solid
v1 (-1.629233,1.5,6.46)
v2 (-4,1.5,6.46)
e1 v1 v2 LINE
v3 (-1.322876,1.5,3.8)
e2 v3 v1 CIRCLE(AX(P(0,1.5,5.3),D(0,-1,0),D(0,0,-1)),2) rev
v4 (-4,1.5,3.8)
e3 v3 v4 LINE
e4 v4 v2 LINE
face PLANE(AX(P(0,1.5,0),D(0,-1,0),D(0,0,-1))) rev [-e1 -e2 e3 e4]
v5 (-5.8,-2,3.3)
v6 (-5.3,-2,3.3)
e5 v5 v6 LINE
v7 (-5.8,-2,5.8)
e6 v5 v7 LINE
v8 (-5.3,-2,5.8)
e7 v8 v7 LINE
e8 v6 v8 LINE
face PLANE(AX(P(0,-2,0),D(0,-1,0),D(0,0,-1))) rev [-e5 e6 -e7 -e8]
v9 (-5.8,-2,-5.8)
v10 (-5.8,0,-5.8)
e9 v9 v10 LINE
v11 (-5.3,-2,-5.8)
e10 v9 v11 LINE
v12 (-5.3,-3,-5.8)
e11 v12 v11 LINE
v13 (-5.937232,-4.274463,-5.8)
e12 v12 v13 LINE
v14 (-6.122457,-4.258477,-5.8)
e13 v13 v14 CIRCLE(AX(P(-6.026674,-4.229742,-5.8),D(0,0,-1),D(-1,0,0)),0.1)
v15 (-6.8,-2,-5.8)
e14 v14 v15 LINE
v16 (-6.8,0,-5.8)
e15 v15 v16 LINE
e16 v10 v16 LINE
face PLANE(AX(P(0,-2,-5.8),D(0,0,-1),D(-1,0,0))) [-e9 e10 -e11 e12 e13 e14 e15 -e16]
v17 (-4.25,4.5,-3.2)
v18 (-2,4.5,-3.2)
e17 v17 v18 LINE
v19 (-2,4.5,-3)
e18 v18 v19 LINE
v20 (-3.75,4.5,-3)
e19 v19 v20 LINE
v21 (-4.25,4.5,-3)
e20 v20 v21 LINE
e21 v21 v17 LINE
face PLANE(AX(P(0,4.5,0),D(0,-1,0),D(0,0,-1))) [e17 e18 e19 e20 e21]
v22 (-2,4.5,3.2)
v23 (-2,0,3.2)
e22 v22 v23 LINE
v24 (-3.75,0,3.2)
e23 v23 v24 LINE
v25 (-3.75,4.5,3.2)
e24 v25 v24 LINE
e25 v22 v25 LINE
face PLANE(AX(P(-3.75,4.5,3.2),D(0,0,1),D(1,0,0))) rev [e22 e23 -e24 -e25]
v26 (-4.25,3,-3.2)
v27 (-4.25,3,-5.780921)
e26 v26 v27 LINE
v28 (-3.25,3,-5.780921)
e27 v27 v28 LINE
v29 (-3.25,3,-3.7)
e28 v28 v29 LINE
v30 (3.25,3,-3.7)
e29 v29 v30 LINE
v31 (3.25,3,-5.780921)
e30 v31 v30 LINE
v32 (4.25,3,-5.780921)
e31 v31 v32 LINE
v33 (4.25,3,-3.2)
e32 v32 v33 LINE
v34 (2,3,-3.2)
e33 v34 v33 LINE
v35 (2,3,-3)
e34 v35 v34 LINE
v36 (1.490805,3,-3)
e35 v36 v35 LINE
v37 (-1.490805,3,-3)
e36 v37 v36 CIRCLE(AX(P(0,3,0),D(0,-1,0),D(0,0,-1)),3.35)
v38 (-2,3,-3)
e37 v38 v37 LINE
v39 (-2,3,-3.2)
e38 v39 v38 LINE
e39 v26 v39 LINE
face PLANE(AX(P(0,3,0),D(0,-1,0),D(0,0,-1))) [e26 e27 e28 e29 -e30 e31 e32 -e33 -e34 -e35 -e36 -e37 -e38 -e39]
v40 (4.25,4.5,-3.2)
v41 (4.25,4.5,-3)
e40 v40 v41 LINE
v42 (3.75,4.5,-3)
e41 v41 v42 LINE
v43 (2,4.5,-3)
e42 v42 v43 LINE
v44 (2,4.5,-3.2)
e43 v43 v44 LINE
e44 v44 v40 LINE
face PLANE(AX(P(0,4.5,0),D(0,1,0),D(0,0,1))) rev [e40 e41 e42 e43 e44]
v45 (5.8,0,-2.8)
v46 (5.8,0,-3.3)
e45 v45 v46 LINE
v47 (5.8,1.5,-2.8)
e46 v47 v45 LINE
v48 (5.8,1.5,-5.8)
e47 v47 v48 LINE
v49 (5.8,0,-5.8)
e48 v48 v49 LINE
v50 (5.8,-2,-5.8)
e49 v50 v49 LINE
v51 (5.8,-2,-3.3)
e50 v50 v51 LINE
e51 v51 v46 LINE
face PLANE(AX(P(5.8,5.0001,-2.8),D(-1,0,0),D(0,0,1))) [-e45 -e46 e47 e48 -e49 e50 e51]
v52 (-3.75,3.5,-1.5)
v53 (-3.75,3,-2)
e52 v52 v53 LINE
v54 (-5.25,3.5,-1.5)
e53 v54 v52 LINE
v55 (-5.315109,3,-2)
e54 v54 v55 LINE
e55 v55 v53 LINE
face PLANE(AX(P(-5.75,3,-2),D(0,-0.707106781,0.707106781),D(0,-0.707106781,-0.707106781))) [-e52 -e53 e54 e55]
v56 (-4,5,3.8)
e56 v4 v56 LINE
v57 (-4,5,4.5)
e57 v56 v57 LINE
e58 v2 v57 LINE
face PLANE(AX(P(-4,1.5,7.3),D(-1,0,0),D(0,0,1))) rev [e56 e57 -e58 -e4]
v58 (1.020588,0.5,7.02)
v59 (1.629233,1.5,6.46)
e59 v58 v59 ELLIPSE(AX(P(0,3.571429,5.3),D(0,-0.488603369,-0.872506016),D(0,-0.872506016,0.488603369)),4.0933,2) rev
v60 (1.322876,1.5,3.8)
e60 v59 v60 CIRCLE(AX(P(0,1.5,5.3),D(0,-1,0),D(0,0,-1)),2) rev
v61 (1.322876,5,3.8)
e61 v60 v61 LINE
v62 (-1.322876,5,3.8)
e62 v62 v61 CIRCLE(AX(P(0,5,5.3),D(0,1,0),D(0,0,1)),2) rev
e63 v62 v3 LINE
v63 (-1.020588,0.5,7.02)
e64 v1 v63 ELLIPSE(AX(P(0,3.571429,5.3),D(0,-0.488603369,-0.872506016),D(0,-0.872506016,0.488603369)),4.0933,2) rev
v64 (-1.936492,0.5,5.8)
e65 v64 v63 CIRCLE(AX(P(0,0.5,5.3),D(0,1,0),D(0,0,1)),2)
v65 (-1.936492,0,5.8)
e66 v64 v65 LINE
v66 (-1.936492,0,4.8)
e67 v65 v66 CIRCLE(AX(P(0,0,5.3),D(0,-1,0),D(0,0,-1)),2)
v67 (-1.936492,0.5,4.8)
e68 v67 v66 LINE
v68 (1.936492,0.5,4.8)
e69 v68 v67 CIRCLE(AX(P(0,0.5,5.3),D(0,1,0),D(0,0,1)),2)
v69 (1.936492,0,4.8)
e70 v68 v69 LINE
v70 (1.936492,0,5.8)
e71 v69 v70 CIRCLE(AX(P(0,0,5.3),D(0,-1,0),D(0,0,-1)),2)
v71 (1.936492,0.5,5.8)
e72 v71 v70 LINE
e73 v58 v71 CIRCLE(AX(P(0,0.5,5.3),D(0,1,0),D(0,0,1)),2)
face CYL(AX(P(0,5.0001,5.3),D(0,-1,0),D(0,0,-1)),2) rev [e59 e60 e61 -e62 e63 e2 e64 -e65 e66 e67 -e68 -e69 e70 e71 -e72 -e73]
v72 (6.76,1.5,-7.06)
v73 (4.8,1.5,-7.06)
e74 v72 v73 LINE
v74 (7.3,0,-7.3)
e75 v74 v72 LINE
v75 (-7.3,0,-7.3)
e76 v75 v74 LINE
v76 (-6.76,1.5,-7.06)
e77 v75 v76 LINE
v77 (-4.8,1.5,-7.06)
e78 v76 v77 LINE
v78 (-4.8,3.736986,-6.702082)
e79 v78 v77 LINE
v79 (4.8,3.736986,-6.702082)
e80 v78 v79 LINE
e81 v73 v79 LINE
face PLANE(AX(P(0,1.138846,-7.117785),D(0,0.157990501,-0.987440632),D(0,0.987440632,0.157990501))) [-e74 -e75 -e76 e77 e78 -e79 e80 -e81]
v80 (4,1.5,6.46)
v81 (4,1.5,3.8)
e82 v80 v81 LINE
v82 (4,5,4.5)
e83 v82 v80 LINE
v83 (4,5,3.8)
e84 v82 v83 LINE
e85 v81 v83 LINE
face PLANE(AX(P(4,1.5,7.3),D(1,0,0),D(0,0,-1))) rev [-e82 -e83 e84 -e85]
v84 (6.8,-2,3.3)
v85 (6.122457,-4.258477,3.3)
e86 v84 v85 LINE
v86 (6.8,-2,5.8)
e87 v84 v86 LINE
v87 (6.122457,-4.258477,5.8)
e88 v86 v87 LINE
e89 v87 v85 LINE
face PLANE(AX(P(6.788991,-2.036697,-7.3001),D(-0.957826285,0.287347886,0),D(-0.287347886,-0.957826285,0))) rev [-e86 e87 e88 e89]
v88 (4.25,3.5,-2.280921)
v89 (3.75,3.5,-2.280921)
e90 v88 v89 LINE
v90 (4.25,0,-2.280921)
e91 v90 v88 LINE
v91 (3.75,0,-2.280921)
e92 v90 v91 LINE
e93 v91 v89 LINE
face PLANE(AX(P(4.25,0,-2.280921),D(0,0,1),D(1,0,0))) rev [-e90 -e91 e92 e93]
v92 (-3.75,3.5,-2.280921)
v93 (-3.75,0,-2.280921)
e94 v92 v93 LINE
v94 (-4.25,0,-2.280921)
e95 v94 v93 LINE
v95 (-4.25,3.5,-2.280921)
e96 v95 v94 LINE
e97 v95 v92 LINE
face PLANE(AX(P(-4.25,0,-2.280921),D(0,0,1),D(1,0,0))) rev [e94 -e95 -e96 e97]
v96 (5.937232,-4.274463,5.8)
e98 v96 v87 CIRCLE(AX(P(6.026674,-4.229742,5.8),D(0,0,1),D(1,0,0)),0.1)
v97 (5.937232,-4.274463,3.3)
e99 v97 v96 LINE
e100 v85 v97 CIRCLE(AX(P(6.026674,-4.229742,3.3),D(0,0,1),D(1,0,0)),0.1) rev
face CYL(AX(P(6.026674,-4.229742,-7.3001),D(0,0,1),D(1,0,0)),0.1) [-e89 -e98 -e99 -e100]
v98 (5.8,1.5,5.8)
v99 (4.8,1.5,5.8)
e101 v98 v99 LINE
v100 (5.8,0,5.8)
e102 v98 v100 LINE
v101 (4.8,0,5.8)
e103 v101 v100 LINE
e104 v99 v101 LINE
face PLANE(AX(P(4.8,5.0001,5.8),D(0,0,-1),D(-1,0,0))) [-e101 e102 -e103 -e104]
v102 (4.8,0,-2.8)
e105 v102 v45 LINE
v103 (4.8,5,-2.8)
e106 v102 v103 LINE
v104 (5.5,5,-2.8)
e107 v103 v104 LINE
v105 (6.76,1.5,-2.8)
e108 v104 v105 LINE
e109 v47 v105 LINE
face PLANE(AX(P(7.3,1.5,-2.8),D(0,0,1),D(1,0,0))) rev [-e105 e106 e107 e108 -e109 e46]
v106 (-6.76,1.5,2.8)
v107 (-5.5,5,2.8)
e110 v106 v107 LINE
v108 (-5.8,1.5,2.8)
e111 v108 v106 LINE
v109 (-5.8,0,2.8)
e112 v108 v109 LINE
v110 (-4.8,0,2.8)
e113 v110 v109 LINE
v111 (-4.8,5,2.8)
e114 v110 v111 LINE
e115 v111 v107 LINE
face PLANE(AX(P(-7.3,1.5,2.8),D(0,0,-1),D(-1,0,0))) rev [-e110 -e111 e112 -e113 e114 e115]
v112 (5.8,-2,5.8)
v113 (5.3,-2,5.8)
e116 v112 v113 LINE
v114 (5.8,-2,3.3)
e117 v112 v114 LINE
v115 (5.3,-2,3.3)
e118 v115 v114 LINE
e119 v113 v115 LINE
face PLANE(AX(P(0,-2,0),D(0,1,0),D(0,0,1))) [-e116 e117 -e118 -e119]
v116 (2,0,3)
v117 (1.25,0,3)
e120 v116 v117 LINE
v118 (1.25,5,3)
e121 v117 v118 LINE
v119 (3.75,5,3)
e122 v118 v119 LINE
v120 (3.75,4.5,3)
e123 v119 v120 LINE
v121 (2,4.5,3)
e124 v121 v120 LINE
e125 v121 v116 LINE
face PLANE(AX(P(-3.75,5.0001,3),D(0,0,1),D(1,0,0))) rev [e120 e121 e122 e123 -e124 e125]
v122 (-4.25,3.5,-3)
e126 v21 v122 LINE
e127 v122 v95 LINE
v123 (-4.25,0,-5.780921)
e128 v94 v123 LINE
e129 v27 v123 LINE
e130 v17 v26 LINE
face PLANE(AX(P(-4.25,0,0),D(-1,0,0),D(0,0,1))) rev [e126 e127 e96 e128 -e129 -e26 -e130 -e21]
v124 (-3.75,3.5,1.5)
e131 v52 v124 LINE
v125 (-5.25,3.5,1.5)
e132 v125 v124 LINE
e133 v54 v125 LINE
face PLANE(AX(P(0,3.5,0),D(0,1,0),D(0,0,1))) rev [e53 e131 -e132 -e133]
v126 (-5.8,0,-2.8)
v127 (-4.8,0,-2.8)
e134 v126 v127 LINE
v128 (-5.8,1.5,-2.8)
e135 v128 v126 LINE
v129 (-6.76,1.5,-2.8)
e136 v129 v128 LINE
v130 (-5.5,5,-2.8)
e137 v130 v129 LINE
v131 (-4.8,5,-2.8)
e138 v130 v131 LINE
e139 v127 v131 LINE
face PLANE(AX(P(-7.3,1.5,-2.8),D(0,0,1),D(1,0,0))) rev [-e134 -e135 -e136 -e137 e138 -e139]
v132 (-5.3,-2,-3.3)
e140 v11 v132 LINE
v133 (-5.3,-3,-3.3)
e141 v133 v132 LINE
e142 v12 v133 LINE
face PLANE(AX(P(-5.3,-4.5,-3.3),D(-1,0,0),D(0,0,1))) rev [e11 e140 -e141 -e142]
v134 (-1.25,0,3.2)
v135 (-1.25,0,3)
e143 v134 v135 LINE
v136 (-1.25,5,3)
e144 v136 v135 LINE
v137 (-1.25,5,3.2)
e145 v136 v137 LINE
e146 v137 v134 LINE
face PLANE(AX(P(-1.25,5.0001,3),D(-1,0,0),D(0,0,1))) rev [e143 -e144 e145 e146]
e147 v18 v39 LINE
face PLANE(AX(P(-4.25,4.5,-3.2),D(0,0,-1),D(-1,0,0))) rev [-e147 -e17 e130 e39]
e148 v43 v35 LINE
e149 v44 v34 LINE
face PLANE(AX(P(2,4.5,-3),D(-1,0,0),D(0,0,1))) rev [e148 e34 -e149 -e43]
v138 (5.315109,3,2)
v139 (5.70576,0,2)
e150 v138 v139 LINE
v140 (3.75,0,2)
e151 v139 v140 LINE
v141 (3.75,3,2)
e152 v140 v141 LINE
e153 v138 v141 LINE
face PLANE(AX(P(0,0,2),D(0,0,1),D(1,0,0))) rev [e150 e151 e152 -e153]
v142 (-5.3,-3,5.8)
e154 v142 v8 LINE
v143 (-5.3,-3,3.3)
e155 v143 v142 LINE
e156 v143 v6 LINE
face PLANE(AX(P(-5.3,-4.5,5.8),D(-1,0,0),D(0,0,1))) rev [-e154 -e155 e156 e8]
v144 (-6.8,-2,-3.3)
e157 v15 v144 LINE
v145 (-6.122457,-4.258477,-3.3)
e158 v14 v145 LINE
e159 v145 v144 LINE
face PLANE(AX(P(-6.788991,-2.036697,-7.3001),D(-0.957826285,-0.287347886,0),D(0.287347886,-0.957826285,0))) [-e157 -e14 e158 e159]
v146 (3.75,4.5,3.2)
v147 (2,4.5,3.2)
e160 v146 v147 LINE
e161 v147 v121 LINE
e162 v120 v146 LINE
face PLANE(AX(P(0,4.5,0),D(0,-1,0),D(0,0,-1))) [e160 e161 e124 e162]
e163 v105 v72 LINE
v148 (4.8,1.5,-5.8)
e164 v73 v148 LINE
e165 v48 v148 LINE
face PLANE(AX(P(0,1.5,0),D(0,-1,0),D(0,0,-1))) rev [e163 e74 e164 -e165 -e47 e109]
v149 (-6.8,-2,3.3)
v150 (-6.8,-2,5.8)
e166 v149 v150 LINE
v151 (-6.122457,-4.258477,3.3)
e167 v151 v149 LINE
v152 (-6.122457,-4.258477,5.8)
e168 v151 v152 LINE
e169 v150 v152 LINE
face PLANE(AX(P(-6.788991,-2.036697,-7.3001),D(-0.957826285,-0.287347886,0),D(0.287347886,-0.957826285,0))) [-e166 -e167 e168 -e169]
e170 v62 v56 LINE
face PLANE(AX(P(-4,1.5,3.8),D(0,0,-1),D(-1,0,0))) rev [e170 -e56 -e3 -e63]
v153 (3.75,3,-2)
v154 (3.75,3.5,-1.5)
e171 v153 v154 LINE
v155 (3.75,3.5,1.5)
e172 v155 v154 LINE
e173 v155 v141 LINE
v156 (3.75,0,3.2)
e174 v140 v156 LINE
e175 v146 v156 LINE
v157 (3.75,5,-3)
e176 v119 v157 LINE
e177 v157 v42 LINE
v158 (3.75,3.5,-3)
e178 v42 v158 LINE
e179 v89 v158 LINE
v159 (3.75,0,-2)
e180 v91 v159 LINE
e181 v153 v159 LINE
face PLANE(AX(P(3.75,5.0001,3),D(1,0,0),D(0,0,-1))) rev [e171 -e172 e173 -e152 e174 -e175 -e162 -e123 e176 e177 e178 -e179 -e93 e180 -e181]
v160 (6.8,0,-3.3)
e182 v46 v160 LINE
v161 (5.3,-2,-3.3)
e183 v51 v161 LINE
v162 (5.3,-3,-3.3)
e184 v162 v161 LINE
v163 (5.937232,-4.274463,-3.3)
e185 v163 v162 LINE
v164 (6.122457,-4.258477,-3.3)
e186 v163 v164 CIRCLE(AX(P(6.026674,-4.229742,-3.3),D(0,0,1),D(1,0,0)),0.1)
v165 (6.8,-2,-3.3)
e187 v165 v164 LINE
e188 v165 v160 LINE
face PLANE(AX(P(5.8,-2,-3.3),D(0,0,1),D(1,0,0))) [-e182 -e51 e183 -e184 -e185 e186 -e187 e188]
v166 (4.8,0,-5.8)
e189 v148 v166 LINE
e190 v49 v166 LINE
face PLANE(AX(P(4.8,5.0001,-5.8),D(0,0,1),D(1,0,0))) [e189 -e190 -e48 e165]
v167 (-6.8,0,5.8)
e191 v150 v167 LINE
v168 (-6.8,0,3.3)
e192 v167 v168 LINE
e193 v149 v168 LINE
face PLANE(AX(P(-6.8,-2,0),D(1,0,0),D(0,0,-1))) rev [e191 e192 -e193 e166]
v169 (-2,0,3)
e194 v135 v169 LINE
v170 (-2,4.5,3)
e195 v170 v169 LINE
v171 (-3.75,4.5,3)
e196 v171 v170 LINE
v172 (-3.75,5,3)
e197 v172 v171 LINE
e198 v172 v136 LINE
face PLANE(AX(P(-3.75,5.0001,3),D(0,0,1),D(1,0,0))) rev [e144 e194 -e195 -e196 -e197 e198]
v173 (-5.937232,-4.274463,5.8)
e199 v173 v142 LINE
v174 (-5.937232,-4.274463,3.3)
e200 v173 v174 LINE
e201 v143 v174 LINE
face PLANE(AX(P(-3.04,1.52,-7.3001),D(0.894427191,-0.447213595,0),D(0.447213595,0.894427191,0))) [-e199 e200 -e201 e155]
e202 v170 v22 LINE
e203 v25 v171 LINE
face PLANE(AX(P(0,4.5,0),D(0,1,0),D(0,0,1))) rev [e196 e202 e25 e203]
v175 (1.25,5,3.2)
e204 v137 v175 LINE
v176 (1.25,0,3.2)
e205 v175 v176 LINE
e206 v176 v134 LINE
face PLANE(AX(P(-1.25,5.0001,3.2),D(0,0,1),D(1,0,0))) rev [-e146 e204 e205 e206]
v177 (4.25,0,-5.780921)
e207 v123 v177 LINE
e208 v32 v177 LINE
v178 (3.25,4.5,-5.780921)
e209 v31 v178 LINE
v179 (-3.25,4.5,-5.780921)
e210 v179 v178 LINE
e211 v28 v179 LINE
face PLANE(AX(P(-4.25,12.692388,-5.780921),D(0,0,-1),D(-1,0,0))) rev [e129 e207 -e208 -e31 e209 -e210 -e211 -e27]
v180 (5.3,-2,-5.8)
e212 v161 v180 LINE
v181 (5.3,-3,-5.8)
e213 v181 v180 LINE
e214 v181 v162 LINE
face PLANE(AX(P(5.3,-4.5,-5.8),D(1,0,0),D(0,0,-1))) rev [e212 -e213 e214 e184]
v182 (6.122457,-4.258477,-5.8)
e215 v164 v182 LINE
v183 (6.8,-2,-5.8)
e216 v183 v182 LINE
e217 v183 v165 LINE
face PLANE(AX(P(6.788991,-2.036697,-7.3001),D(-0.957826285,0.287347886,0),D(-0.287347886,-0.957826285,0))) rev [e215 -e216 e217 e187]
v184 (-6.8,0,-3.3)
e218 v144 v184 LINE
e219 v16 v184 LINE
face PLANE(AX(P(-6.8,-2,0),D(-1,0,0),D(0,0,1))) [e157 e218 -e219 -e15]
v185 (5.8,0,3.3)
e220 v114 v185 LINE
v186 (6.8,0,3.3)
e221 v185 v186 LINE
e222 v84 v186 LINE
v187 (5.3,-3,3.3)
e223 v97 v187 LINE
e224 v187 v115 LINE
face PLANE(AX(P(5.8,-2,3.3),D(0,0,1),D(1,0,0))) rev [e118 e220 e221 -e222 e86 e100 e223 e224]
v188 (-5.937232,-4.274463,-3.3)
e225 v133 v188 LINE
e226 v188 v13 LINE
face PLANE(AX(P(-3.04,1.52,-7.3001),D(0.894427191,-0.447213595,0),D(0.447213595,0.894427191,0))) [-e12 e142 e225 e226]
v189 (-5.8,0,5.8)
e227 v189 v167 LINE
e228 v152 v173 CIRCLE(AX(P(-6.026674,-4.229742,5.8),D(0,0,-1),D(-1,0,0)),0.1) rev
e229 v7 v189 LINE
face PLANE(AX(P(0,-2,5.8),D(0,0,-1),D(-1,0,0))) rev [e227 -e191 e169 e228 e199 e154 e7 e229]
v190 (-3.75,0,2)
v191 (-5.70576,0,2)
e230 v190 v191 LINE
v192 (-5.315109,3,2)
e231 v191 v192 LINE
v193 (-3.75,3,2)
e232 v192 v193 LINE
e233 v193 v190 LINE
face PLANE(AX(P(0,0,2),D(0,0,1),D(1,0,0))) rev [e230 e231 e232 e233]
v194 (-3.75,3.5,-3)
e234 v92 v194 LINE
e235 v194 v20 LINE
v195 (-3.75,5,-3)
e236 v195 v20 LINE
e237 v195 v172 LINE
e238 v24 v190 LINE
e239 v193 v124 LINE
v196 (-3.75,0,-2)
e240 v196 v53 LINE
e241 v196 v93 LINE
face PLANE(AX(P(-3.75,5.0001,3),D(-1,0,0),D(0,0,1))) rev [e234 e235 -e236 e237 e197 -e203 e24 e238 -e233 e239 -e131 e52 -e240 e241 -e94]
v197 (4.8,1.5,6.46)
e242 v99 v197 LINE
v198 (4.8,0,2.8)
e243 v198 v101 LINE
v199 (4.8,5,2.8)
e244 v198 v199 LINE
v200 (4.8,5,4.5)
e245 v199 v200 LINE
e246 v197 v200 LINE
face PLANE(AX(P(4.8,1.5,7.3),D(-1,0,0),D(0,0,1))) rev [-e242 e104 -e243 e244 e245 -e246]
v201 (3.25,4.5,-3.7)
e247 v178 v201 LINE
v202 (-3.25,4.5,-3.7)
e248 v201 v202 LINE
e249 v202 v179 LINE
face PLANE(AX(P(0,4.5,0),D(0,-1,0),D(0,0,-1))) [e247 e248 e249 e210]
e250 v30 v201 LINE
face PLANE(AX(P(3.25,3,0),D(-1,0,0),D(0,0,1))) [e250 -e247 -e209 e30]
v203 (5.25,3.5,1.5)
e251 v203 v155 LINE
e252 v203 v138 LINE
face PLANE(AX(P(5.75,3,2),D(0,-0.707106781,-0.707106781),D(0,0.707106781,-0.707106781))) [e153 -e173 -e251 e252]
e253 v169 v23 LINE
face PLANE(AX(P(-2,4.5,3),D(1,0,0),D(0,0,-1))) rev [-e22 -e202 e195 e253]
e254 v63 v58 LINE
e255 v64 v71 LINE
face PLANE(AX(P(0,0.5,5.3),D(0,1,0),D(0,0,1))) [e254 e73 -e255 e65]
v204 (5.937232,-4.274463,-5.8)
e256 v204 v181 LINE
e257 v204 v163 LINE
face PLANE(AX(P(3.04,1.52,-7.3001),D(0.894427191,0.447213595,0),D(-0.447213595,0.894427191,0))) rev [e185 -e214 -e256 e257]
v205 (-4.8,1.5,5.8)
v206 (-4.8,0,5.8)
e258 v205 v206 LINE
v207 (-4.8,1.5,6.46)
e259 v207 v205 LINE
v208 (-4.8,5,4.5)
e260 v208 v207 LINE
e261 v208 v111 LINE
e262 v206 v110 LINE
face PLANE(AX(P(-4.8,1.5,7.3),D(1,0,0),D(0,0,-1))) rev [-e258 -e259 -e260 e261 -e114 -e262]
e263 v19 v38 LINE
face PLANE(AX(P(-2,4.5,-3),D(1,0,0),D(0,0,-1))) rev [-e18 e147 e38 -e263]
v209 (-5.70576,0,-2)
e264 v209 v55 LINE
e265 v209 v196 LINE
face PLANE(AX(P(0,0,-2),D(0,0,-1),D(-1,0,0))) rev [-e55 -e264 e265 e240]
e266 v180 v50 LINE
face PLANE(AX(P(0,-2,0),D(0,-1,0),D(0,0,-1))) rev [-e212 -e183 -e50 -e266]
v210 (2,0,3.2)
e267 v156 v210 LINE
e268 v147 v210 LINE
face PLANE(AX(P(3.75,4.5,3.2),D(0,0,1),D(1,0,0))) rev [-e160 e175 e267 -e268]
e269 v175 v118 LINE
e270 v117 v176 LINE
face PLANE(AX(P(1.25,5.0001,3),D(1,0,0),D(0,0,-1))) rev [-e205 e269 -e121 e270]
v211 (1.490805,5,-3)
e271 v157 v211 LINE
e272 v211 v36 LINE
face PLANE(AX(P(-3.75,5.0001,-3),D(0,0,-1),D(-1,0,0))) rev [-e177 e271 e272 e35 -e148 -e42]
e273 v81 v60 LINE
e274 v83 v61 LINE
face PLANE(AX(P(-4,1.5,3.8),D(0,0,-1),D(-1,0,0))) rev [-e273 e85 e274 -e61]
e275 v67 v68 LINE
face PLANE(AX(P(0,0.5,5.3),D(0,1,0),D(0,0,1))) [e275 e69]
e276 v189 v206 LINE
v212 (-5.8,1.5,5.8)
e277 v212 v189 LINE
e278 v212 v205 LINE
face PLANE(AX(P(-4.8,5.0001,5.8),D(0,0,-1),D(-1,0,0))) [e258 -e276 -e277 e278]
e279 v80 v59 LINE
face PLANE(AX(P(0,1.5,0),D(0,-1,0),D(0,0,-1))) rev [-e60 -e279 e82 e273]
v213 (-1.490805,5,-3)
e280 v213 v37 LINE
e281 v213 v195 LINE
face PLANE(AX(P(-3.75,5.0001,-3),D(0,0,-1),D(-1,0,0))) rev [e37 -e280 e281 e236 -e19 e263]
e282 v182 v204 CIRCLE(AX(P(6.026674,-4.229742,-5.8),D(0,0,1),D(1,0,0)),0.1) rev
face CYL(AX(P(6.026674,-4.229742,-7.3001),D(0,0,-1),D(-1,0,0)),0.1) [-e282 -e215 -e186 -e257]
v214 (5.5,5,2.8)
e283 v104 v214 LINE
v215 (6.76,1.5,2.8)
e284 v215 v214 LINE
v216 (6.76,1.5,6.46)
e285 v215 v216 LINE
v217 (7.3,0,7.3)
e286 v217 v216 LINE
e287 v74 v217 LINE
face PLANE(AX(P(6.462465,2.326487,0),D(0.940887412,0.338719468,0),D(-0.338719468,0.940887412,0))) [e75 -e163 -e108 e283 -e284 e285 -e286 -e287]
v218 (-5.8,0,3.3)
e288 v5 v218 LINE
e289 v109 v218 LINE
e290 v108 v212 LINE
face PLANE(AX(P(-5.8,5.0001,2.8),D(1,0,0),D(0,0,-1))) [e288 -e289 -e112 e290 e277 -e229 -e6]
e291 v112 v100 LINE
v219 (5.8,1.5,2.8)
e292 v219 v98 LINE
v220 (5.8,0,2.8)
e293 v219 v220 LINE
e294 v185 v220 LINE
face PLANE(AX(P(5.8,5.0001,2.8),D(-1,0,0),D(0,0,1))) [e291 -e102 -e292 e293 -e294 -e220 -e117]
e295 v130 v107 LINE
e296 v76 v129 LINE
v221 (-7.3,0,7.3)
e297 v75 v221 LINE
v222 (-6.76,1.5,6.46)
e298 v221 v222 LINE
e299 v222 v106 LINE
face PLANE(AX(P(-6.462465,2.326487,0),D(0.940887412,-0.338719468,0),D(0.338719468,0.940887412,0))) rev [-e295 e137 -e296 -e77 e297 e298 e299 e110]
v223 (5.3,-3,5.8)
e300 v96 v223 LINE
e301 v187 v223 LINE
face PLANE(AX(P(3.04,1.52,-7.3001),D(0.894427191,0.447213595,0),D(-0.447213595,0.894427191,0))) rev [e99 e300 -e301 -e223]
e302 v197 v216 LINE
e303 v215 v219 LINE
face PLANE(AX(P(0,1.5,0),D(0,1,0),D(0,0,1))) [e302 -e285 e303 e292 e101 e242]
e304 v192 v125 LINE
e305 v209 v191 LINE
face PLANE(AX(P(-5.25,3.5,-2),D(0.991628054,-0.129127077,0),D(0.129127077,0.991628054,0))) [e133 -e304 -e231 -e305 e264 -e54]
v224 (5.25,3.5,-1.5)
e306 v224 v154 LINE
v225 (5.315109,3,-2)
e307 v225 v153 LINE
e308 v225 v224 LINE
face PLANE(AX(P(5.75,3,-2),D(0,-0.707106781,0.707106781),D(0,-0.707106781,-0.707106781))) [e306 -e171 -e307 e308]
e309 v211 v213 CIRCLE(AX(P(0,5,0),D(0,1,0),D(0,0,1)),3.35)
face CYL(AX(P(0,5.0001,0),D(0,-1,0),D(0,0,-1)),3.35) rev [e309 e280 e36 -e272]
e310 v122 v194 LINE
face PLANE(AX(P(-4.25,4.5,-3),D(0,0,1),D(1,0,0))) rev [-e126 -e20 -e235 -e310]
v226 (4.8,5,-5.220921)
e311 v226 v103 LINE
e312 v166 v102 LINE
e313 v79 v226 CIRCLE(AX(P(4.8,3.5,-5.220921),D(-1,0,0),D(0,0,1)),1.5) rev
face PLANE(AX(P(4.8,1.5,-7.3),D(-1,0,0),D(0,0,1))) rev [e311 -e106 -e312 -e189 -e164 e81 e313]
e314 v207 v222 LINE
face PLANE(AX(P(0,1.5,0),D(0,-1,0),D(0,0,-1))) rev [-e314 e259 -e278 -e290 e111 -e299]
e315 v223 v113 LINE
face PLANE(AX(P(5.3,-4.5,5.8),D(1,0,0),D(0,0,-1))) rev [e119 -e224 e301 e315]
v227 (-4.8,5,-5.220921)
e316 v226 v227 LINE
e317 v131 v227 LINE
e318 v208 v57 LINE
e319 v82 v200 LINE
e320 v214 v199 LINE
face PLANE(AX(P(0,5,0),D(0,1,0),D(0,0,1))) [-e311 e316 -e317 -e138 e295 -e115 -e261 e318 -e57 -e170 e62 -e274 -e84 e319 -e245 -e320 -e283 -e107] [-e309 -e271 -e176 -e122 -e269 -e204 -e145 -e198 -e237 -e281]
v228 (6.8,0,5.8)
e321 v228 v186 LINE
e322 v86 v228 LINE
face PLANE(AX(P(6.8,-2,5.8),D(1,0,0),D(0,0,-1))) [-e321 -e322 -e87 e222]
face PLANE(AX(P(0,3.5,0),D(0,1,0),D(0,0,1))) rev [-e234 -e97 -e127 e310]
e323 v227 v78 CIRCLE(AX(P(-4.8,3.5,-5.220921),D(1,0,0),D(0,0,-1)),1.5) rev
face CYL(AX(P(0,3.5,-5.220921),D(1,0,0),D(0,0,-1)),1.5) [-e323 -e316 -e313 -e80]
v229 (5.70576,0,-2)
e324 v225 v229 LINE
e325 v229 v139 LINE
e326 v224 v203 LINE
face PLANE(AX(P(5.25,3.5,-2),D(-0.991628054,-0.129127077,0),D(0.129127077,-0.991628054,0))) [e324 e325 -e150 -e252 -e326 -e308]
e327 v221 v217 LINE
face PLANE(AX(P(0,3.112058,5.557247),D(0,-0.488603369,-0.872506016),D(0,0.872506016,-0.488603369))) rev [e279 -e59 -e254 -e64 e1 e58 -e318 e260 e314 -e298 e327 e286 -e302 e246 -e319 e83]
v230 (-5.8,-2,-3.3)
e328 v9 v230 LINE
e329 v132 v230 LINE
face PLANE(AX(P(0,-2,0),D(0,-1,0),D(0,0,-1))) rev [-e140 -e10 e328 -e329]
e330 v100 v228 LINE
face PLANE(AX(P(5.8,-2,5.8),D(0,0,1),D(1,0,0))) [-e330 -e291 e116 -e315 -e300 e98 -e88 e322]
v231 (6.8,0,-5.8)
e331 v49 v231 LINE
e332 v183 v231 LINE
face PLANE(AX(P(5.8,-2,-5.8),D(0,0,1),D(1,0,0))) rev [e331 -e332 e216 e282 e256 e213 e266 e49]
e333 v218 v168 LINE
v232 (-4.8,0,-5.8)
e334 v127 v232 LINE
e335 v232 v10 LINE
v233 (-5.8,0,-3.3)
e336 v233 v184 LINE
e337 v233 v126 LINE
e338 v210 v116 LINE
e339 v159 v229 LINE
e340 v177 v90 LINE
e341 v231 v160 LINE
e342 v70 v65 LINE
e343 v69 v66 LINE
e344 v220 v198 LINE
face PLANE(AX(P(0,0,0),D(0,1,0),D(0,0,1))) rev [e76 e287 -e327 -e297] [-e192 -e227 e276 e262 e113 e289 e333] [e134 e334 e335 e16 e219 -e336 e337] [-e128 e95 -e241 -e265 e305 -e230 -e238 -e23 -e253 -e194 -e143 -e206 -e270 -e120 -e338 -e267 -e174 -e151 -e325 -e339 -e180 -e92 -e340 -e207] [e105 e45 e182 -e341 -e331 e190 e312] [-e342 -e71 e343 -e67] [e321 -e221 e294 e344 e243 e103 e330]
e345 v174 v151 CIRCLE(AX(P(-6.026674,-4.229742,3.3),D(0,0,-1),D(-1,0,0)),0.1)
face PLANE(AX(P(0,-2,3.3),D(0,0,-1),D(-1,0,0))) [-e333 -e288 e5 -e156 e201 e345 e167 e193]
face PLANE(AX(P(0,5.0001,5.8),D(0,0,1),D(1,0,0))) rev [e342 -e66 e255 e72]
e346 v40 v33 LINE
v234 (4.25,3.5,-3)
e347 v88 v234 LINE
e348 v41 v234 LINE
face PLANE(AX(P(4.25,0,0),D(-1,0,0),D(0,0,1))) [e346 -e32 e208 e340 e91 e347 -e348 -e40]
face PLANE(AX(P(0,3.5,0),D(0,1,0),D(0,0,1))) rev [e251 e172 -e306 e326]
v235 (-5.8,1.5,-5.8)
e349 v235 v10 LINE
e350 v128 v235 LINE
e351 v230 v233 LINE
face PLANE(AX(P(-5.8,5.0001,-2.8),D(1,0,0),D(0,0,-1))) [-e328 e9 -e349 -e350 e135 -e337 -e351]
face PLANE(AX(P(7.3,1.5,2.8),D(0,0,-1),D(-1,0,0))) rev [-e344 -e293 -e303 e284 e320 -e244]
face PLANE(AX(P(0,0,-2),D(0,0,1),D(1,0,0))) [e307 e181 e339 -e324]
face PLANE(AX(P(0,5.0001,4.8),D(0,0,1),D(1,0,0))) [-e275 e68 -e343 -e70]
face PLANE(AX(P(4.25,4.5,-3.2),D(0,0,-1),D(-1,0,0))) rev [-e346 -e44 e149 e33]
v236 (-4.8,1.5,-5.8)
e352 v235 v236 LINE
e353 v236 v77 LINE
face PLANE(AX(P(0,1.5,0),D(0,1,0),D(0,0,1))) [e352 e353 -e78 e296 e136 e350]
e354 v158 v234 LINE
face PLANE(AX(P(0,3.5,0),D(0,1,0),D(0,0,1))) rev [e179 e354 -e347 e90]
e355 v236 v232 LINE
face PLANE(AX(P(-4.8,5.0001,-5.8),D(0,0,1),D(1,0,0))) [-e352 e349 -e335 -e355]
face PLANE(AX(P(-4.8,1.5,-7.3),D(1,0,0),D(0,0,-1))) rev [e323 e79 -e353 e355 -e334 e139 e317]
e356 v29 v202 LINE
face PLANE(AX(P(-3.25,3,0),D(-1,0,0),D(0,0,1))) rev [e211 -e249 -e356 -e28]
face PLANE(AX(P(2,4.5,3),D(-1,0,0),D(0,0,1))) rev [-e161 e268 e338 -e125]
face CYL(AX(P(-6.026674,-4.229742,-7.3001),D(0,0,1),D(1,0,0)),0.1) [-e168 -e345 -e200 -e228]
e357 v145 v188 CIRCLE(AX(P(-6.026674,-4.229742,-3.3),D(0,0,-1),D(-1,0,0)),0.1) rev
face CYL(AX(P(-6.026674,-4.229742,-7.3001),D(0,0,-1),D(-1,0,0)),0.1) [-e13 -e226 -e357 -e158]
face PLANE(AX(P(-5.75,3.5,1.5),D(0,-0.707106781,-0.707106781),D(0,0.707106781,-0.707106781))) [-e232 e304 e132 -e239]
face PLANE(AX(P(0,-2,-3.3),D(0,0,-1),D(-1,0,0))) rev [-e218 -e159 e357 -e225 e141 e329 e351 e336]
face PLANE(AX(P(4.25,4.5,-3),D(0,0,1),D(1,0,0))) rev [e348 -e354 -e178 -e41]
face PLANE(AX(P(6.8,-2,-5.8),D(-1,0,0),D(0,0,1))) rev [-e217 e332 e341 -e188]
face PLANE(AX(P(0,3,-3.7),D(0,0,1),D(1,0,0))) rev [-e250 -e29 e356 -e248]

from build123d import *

# Parameters (mm, degrees)
FILLET1_R               = 1.5
SKETCH4_W               = 2.5
SKETCH4_H               = 4.5
SKETCH4_W_2             = 8
SKETCH4_H_2             = 3.5
CUT_EXTRUDE1_DEPTH      = 3.5
SKETCH3_W               = 7.5
SKETCH3_H               = 6
CUT_EXTRUDE2_DEPTH      = 12.470832747
CUT_EXTRUDE5_DEPTH      = 11.900917559
CUT_EXTRUDE5_DEPTH_BACK = 1
SKETCH5_R               = 2
CUT_EXTRUDE6_START      = -0.5
CUT_EXTRUDE6_DEPTH      = 1.5
SKETCH9_W               = 1
SKETCH9_H               = 3
CUT_EXTRUDE9_DEPTH      = 12.470832747
CUT_EXTRUDE10_DEPTH     = 0.7
CUT_EXTRUDE11_DEPTH     = 0.7
CUT_EXTRUDE12_DEPTH     = 4
BOSS_EXTRUDE1_DEPTH     = 2
BOSS_EXTRUDE2_DEPTH     = 2
CUT_EXTRUDE17_DEPTH     = 0.45
CUT_EXTRUDE18_DEPTH     = 0.45
CUT_EXTRUDE19_DEPTH     = 0.5
CUT_EXTRUDE20_DEPTH     = 0.5
CUT_EXTRUDE22_START     = -3.5
SKETCH29_W              = 8.5
SKETCH29_H              = 3.5
CUT_EXTRUDE22_DEPTH     = 3.5
BOSS_EXTRUDE6_DEPTH     = 0.5
SKETCH33_W              = 2.25
SKETCH33_H              = 0.2
CUT_EXTRUDE23_DEPTH     = 1.5
SKETCH35_W              = 6.5
SKETCH35_H              = 2.080921332
CUT_EXTRUDE24_DEPTH     = 1
CUT_EXTRUDE25_DEPTH     = 11.750814086
SKETCH37_W              = 1.75
SKETCH37_H              = 0.2
CUT_EXTRUDE26_DEPTH     = 4.5
SKETCH38_W              = 2.5
SKETCH38_H              = 0.2
CUT_EXTRUDE27_DEPTH     = 12.470832747
SKETCH39_W              = 1
SKETCH39_H              = 2.5
BOSS_EXTRUDE9_DEPTH     = 2
SKETCH40_W              = 1.5
SKETCH40_H              = 2.5
BOSS_EXTRUDE10_DEPTH    = 2.5
CUT_EXTRUDE28_DEPTH     = 16.808225868
FILLET3_R               = 0.1


with BuildPart() as part:
    # Sketch1 → Loft1 section 0
    with BuildSketch(Plane(origin=(0, 0, 0), x_dir=(1, 0, 0), z_dir=(0, 1, 0))):
        with BuildLine():
            Line((-7.3, 7.3), (7.3, 7.3))
            Line((7.3, 7.3), (7.3, -7.3))
            Line((7.3, -7.3), (-7.3, -7.3))
            Line((-7.3, -7.3), (-7.3, 7.3))
        make_face()
    # Sketch2 → Loft1 section 1
    with BuildSketch(Plane(origin=(0, 5, 0), x_dir=(1, 0, 0), z_dir=(0, 1, 0))):
        with BuildLine():
            Line((-5.5, 6.5), (5.5, 6.5))
            Line((5.5, 6.5), (5.5, -4.5))
            Line((5.5, -4.5), (-5.5, -4.5))
            Line((-5.5, -4.5), (-5.5, 6.5))
        make_face()
    loft()

    # Fillet1
    fillet1_edges = [part.edges().sort_by_distance(p)[0] for p in [
        (0, 5, -6.5),
    ]]
    fillet(fillet1_edges, radius=FILLET1_R)

    # Sketch4 → Cut-Extrude1 (cut)
    with BuildSketch(Plane(origin=(0, 5, 0), x_dir=(1, 0, 0), z_dir=(0, 1, 0))):
        with Locations((-6.05, -5.05)):
            Rectangle(SKETCH4_W, SKETCH4_H)
        with Locations((6.05, 5.05)):
            Rectangle(SKETCH4_W, SKETCH4_H)
        with Locations((-6.05, 5.05)):
            Rectangle(SKETCH4_W, SKETCH4_H)
        with Locations((6.05, -5.05)):
            Rectangle(SKETCH4_W, SKETCH4_H)
        with Locations((0, -5.55)):
            Rectangle(SKETCH4_W_2, SKETCH4_H_2)
    extrude(amount=-CUT_EXTRUDE1_DEPTH, mode=Mode.SUBTRACT)

    # Shell2: read off the stored shape, not the designer's step
    # Shell2: loft between two sections, ruled curve by curve
    shell2_from = [
        Edge.make_line((5.705760369, 0, 1.3), (5.705760369, 0, -1.3)),
        Edge.make_line((-3.3, 0, -5.780921332), (3.3, 0, -5.780921332)),
        Edge.make_line((-5.705760369, 0, 1.3), (-5.705760369, 0, -1.3)),
        Edge.make_line((5.705760369, 0, -1.3), (3.3, 0, -1.3)),
        Edge.make_line((-5.705760369, 0, -1.3), (-3.3, 0, -1.3)),
        Edge.make_line((3.3, 0, -5.780921332), (3.3, 0, -1.3)),
        Edge.make_line((3.3, 0, 1.3), (3.3, 0, 2.3)),
        Edge.make_line((-3.3, 0, -5.780921332), (-3.3, 0, -1.3)),
        Edge.make_line((-3.3, 0, 2.3), (-3.3, 0, 1.3)),
        Edge.make_line((-3.3, 0, 1.3), (-5.705760369, 0, 1.3)),
        Edge.make_line((5.705760369, 0, 1.3), (3.3, 0, 1.3)),
        Edge.make_line((3.3, 0, 2.3), (-3.3, 0, 2.3)),
    ]
    shell2_to = [
        Edge.make_line((4.445760369, 3.5, 1.3), (4.445760369, 3.5, -1.3)),
        Edge.make_line((-3.3, 3.5, -5.220921332), (3.3, 3.5, -5.220921332)),
        Edge.make_line((-4.445760369, 3.5, 1.3), (-4.445760369, 3.5, -1.3)),
        Edge.make_line((4.445760369, 3.5, -1.3), (3.3, 3.5, -1.3)),
        Edge.make_line((-4.445760369, 3.5, -1.3), (-3.3, 3.5, -1.3)),
        Edge.make_line((3.3, 3.5, -5.220921332), (3.3, 3.5, -1.3)),
        Edge.make_line((3.3, 3.5, 1.3), (3.3, 3.5, 2.3)),
        Edge.make_line((-3.3, 3.5, -5.220921332), (-3.3, 3.5, -1.3)),
        Edge.make_line((-3.3, 3.5, 2.3), (-3.3, 3.5, 1.3)),
        Edge.make_line((-3.3, 3.5, 1.3), (-4.445760369, 3.5, 1.3)),
        Edge.make_line((4.445760369, 3.5, 1.3), (3.3, 3.5, 1.3)),
        Edge.make_line((3.3, 3.5, 2.3), (-3.3, 3.5, 2.3)),
    ]
    shell2 = Solid(Shell([*[Face.make_surface_from_curves(shell2_from[k], shell2_to[k]) for k in range(12)], Face(Wire(shell2_from)), Face(Wire(shell2_to))]))
    add(shell2, mode=Mode.SUBTRACT)

    # Sketch3 → Cut-Extrude2 (cut, through all)
    with BuildSketch(Plane.XZ):
        Rectangle(SKETCH3_W, SKETCH3_H)
    extrude(amount=-CUT_EXTRUDE2_DEPTH, mode=Mode.SUBTRACT)

    # Sketch5 → Cut-Extrude5 (cut, two sides: drawn at the far end of the back side and taken through both)
    with BuildSketch(Plane(origin=(0, 1.5, 0), x_dir=(1, 0, 0), z_dir=(0, 1, 0)).offset(-CUT_EXTRUDE5_DEPTH_BACK)):
        with Locations((0, -5.3)):
            Circle(SKETCH5_R)
    extrude(amount=CUT_EXTRUDE5_DEPTH + CUT_EXTRUDE5_DEPTH_BACK, mode=Mode.SUBTRACT)

    # Cut-Extrude6: read off the stored shape, not the designer's step
    # Cut-Extrude6 outline → Cut-Extrude6 (cut)
    with BuildSketch(Plane.XZ.offset(CUT_EXTRUDE6_START)):
        with BuildLine():
            Line((1.936491673, 5.8), (-1.936491673, 5.8))
            ThreePointArc((-1.936491673, 5.8), (-2, 5.3), (-1.936491673, 4.8))
            Line((-1.936491673, 4.8), (1.936491673, 4.8))
            ThreePointArc((1.936491673, 4.8), (2, 5.3), (1.936491673, 5.8))
        make_face()
    extrude(amount=CUT_EXTRUDE6_DEPTH, mode=Mode.SUBTRACT)

    # Sketch9 → Cut-Extrude9 (cut, through all)
    with BuildSketch(Plane(origin=(0, 0, 0), x_dir=(1, 0, 0), z_dir=(0, 1, 0))):
        with Locations((-5.3, 4.3)):
            Rectangle(SKETCH9_W, SKETCH9_H)
        with Locations((5.3, 4.3)):
            Rectangle(SKETCH9_W, SKETCH9_H)
        with Locations((-5.3, -4.3)):
            Rectangle(SKETCH9_W, SKETCH9_H)
        with Locations((5.3, -4.3)):
            Rectangle(SKETCH9_W, SKETCH9_H)
    extrude(amount=CUT_EXTRUDE9_DEPTH, mode=Mode.SUBTRACT)

    # Sketch11 → Cut-Extrude10 (cut)
    with BuildSketch(Plane(origin=(0, 0, 1.3), x_dir=(-1, 0, 0), z_dir=(0, 0, -1))):
        Polygon((-3.75, 0), (-5.705760369, 0), (-4.445760369, 3.5), (-3.75, 3.5), align=None)
        Polygon((3.75, 0), (3.75, 3.5), (4.445760369, 3.5), (5.705760369, 0), align=None)
    extrude(amount=-CUT_EXTRUDE10_DEPTH, mode=Mode.SUBTRACT)

    # Sketch12 → Cut-Extrude11 (cut)
    with BuildSketch(Plane.XY.offset(-1.3)):
        Polygon((3.75, 0), (5.705760369, 0), (4.445760369, 3.5), (3.75, 3.5), align=None)
        Polygon((-3.75, 0), (-5.705760369, 0), (-4.445760369, 3.5), (-3.75, 3.5), align=None)
    extrude(amount=-CUT_EXTRUDE11_DEPTH, mode=Mode.SUBTRACT)

    # Sketch13 → Cut-Extrude12 (cut)
    with BuildSketch(Plane(origin=(0, 0, 2), x_dir=(-1, 0, 0), z_dir=(0, 0, -1))):
        Polygon((3.75, 3.5), (5.25, 3.5), (5.705760369, 0), (3.75, 0), align=None)
        Polygon((-3.75, 3.5), (-5.25, 3.5), (-5.705760369, 0), (-3.75, 0), align=None)
    extrude(amount=CUT_EXTRUDE12_DEPTH, mode=Mode.SUBTRACT)

    # Sketch14 → Boss-Extrude1 (add)
    with BuildSketch(Plane(origin=(-3.75, 0, 0), x_dir=(0, 0, -1), z_dir=(1, 0, 0))):
        Polygon((-2, 3.5), (-1.5, 3.5), (-2, 3), align=None)
        Polygon((1.5, 3.5), (2, 3.5), (2, 3), align=None)
    extrude(amount=-BOSS_EXTRUDE1_DEPTH)

    # Sketch15 → Boss-Extrude2 (add)
    with BuildSketch(Plane.ZY.offset(-3.75)):
        Polygon((2, 3.5), (2, 3), (1.5, 3.5), align=None)
        Polygon((-2, 3.5), (-2, 3), (-1.5, 3.5), align=None)
    extrude(amount=-BOSS_EXTRUDE2_DEPTH)

    # Sketch18 → Cut-Extrude17 (cut)
    with BuildSketch(Plane(origin=(-3.3, 0, 0), x_dir=(0, 0, -1), z_dir=(1, 0, 0))):
        Polygon((5.220921332, 3.5), (3, 3.5), (3, 0), (5.780921332, 0), align=None)
    extrude(amount=-CUT_EXTRUDE17_DEPTH, mode=Mode.SUBTRACT)

    # Sketch19 → Cut-Extrude18 (cut)
    with BuildSketch(Plane.ZY.offset(-3.3)):
        Polygon((-5.780921332, 0), (-3, 0), (-3, 3.5), (-5.220921332, 3.5), align=None)
    extrude(amount=-CUT_EXTRUDE18_DEPTH, mode=Mode.SUBTRACT)

    # Sketch22 → Cut-Extrude19 (cut)
    with BuildSketch(Plane(origin=(-3.75, 0, 0), x_dir=(0, 0, -1), z_dir=(1, 0, 0))):
        Polygon((5.780921332, 0), (2.280921332, 0), (2.280921332, 3.5), (5.220921332, 3.5), align=None)
    extrude(amount=-CUT_EXTRUDE19_DEPTH, mode=Mode.SUBTRACT)

    # Sketch23 → Cut-Extrude20 (cut)
    with BuildSketch(Plane.ZY.offset(-3.75)):
        Polygon((-5.780921332, 0), (-2.280921332, 0), (-2.280921332, 3.5), (-5.220921332, 3.5), align=None)
    extrude(amount=-CUT_EXTRUDE20_DEPTH, mode=Mode.SUBTRACT)

    # Sketch29 → Cut-Extrude22 (cut)
    with BuildSketch(Plane.XZ.offset(CUT_EXTRUDE22_START)):
        with Locations((0, -4.030921332)):
            Rectangle(SKETCH29_W, SKETCH29_H)
    extrude(amount=CUT_EXTRUDE22_DEPTH, mode=Mode.SUBTRACT)

    # Sketch31 → Boss-Extrude6 (add)
    with BuildSketch(Plane.XZ.offset(-3.5)):
        Polygon((-4.25, -3), (-4.25, -5.780921332), (-3.25, -5.780921332), (-3.25, -3.7), (3.25, -3.7), (3.25, -5.780921332), (4.25, -5.780921332), (4.25, -3), (3.75, -3), (-3.75, -3), align=None)
    extrude(amount=BOSS_EXTRUDE6_DEPTH)

    # Sketch33 → Cut-Extrude23 (cut)
    with BuildSketch(Plane.XZ.offset(-3)):
        with Locations((-3.125, -3.1)):
            Rectangle(SKETCH33_W, SKETCH33_H)
        with Locations((3.125, -3.1)):
            Rectangle(SKETCH33_W, SKETCH33_H)
    extrude(amount=-CUT_EXTRUDE23_DEPTH, mode=Mode.SUBTRACT)

    # Sketch35 → Cut-Extrude24 (cut)
    with BuildSketch(Plane.XZ.offset(-3.5)):
        with Locations((0, -4.740460666)):
            Rectangle(SKETCH35_W, SKETCH35_H)
    extrude(amount=-CUT_EXTRUDE24_DEPTH, mode=Mode.SUBTRACT)

    # Sketch36 → Cut-Extrude25 (cut, through all)
    with BuildSketch(Plane.XZ.offset(-3)):
        with BuildLine():
            Line((-1.490805152, -3), (1.490805152, -3))
            ThreePointArc((1.490805152, -3), (0, -3.35), (-1.490805152, -3))
        make_face()
    extrude(amount=-CUT_EXTRUDE25_DEPTH, mode=Mode.SUBTRACT)

    # Sketch37 → Cut-Extrude26 (cut)
    with BuildSketch(Plane.XZ):
        with Locations((-2.875, 3.1)):
            Rectangle(SKETCH37_W, SKETCH37_H)
        with Locations((2.875, 3.1)):
            Rectangle(SKETCH37_W, SKETCH37_H)
    extrude(amount=-CUT_EXTRUDE26_DEPTH, mode=Mode.SUBTRACT)

    # Sketch38 → Cut-Extrude27 (cut, through all)
    with BuildSketch(Plane.XZ):
        with Locations((0, 3.1)):
            Rectangle(SKETCH38_W, SKETCH38_H)
    extrude(amount=-CUT_EXTRUDE27_DEPTH, mode=Mode.SUBTRACT)

    # Sketch39 → Boss-Extrude9 (add)
    with BuildSketch(Plane.XZ):
        with Locations((-6.3, 4.55)):
            Rectangle(SKETCH39_W, SKETCH39_H)
        with Locations((-6.3, -4.55)):
            Rectangle(SKETCH39_W, SKETCH39_H)
        with Locations((6.3, 4.55)):
            Rectangle(SKETCH39_W, SKETCH39_H)
        with Locations((6.3, -4.55)):
            Rectangle(SKETCH39_W, SKETCH39_H)
    extrude(amount=BOSS_EXTRUDE9_DEPTH)

    # Sketch40 → Boss-Extrude10 (add)
    with BuildSketch(Plane.XZ.offset(2)):
        with Locations((-6.05, 4.55)):
            Rectangle(SKETCH40_W, SKETCH40_H)
        with Locations((-6.05, -4.55)):
            Rectangle(SKETCH40_W, SKETCH40_H)
        with Locations((6.05, 4.55)):
            Rectangle(SKETCH40_W, SKETCH40_H)
        with Locations((6.05, -4.55)):
            Rectangle(SKETCH40_W, SKETCH40_H)
    extrude(amount=BOSS_EXTRUDE10_DEPTH)

    # Sketch41 → Cut-Extrude28 (cut, through all)
    with BuildSketch(Plane.XY.offset(5.8)):
        Polygon((-6.05, -4.5), (-6.8, -2), (-6.8, -4.5), align=None)
        Polygon((-5.3, -3), (-6.05, -4.5), (-5.3, -4.5), align=None)
        Polygon((5.3, -4.5), (6.05, -4.5), (5.3, -3), align=None)
        Polygon((6.8, -4.5), (6.8, -2), (6.05, -4.5), align=None)
    extrude(amount=-CUT_EXTRUDE28_DEPTH, mode=Mode.SUBTRACT)

    # Fillet3
    fillet3_edges = [part.edges().sort_by_distance(p)[0] for p in [
        (6.05, -4.5, -4.55),
        (-6.05, -4.5, -4.55),
        (-6.05, -4.5, 4.55),
        (6.05, -4.5, 4.55),
    ]]
    fillet(fillet3_edges, radius=FILLET3_R)


solid = part.part
